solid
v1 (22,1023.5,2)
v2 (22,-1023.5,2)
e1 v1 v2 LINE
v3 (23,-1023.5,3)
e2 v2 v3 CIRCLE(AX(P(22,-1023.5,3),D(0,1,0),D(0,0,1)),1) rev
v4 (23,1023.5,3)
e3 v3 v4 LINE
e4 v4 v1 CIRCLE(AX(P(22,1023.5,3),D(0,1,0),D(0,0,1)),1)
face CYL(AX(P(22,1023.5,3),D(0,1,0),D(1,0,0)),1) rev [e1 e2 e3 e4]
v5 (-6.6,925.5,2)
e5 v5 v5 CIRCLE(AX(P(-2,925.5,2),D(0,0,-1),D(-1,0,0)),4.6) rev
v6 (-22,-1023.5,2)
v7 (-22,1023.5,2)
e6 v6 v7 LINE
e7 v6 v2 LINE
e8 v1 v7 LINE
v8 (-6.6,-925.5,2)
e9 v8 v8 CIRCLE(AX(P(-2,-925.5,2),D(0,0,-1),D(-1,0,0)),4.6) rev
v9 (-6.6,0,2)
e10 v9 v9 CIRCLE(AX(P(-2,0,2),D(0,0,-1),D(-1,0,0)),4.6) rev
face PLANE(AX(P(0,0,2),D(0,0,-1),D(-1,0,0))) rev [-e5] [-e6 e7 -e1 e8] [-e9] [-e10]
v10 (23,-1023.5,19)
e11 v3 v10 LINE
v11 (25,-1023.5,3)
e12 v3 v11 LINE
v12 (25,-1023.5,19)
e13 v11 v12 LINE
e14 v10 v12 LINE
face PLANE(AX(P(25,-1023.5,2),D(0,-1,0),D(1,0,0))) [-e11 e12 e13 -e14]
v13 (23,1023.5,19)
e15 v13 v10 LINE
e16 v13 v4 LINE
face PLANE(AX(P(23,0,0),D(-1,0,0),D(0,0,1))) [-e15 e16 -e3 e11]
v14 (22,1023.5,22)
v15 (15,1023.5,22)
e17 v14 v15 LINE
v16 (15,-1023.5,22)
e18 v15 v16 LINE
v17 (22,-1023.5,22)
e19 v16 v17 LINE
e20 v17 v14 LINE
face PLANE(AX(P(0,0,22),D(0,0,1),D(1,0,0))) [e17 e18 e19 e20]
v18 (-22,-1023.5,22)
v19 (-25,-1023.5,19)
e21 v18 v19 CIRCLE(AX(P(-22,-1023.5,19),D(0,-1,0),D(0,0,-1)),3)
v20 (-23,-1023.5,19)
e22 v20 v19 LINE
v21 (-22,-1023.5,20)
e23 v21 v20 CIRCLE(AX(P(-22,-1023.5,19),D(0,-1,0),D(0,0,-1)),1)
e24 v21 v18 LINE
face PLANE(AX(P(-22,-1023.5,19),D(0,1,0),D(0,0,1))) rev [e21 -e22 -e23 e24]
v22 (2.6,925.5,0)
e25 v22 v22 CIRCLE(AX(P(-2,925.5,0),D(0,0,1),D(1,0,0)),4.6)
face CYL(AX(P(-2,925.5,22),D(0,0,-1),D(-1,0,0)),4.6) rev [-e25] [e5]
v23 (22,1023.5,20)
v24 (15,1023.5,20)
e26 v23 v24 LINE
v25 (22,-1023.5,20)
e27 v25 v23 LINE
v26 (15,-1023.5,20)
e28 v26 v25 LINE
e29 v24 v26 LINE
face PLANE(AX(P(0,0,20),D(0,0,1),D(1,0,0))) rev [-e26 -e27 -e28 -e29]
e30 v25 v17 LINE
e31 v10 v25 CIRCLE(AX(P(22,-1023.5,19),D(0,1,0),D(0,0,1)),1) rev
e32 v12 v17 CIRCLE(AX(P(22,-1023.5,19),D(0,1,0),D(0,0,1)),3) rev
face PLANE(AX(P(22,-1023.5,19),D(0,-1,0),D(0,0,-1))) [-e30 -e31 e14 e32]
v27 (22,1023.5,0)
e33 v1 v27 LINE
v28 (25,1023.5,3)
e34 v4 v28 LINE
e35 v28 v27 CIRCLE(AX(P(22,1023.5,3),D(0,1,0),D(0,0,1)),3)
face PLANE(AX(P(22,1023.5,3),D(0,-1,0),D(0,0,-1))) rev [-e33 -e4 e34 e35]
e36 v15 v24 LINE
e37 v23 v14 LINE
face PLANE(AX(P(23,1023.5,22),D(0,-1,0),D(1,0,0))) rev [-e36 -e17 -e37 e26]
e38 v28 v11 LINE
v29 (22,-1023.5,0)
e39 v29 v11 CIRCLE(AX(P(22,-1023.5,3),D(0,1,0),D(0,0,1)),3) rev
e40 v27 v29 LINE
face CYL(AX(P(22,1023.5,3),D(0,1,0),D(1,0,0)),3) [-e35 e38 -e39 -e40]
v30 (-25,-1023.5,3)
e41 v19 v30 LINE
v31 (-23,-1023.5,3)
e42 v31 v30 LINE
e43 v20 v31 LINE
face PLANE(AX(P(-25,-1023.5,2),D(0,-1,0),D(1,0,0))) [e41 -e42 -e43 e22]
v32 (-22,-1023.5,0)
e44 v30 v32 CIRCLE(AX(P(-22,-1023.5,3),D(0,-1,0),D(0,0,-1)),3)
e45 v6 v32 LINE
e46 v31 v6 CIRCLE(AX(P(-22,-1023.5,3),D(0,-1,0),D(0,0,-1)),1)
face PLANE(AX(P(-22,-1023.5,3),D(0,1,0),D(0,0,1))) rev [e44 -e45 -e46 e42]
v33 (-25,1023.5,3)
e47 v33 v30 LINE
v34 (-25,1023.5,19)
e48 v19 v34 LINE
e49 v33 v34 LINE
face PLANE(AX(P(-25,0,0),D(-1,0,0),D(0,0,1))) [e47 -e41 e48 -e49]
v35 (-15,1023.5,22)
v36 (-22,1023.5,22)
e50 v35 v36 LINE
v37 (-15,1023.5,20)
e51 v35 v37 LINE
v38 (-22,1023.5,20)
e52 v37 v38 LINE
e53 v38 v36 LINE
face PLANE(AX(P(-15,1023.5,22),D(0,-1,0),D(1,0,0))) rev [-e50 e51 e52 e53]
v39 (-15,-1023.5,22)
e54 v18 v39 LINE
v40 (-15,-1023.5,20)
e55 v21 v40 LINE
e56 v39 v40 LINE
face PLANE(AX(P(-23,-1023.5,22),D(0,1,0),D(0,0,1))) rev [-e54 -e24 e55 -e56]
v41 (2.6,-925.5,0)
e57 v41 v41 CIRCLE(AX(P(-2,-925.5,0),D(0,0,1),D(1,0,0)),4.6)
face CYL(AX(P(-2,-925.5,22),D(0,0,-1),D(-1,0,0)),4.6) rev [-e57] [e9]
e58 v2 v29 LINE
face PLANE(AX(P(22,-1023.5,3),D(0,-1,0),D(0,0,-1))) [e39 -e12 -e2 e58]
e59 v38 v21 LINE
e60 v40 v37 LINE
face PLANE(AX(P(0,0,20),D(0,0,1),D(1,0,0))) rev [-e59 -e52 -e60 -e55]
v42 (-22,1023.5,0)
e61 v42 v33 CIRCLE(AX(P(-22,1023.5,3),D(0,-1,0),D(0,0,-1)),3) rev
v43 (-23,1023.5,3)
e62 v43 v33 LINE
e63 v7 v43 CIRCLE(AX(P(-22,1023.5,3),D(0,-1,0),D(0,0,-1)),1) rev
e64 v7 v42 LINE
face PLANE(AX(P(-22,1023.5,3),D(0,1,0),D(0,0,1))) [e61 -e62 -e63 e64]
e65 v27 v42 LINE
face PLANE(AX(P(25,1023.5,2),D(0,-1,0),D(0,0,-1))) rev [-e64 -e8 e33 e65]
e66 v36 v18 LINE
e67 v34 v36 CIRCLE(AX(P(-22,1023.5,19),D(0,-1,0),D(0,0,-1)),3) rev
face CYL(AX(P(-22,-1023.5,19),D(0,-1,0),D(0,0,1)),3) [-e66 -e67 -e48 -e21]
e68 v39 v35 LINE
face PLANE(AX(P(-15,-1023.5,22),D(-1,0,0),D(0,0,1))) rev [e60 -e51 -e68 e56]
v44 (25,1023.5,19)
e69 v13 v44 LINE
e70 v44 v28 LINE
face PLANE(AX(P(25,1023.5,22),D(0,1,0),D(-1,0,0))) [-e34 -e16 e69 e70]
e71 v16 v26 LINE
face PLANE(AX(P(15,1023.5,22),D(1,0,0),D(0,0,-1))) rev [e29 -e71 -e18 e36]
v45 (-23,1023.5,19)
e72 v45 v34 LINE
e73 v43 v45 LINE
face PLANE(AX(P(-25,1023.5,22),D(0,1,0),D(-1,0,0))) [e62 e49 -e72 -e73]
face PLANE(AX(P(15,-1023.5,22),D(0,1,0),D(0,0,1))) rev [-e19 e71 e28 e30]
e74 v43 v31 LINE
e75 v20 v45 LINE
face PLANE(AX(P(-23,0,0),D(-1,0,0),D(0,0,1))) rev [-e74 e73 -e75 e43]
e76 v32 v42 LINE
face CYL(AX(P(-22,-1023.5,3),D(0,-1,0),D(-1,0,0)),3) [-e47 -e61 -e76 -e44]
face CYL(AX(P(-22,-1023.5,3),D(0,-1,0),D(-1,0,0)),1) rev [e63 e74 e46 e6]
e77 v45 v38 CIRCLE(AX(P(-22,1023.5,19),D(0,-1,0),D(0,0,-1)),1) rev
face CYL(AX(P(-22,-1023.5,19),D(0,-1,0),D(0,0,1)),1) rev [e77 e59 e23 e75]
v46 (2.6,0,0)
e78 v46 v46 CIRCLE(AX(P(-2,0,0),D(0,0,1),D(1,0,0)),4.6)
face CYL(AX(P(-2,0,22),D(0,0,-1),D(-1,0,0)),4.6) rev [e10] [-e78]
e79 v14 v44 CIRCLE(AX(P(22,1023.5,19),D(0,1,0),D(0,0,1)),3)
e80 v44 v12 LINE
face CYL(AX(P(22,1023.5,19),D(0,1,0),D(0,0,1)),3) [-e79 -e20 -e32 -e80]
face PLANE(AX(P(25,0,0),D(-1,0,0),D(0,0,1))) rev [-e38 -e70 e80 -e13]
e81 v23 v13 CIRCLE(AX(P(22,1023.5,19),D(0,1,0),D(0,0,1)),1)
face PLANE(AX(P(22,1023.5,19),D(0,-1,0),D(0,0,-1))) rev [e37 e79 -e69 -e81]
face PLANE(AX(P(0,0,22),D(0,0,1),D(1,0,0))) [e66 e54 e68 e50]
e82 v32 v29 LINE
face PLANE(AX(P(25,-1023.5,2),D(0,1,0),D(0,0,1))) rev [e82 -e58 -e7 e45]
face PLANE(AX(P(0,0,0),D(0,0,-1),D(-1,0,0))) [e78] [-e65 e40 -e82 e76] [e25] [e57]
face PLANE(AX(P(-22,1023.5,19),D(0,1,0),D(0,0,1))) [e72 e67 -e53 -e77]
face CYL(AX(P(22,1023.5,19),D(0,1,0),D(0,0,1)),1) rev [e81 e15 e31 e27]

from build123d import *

# Parameters (mm, degrees)
BASEFLANGE_W                   = 50
BASEFLANGE_H                   = 2047
BASE_FLANGE1_DEPTH             = 2
EDGE_FLANGE1_STRIP_W           = 10
EDGE_FLANGE1_STRIP_H           = 2
EDGE_FLANGE1_STRIP_CUT_DEPTH   = 2047
EDGE_FLANGE1_STRIP_2_W         = 10
EDGE_FLANGE1_STRIP_2_H         = 2
EDGE_FLANGE1_STRIP_CUT_2_DEPTH = 2047
EDGE_FLANGE1_DEPTH             = 2047
EDGE_FLANGE1_BEND_DEPTH        = 2047
EDGE_FLANGE2_STRIP_W           = 10
EDGE_FLANGE2_STRIP_H           = 2
EDGE_FLANGE2_STRIP_CUT_DEPTH   = 2047
EDGE_FLANGE2_STRIP_2_W         = 10
EDGE_FLANGE2_STRIP_2_H         = 2
EDGE_FLANGE2_STRIP_CUT_2_DEPTH = 2047
EDGE_FLANGE2_DEPTH             = 2047
EDGE_FLANGE2_BEND_DEPTH        = 2047
HINGEHOLES_R                   = 4.6
CUT_EXTRUDE1_DEPTH             = 1025.041625131


# Sheet-metal steps are written as plain solids
with BuildPart() as part:
    # BaseFlange → Base-Flange1 (new body)
    with BuildSketch(Plane.XY):
        Rectangle(BASEFLANGE_W, BASEFLANGE_H)
    extrude(amount=BASE_FLANGE1_DEPTH)

    # Edge-Flange1 strip (across the edge) → Edge-Flange1 strip cut (cut)
    with BuildSketch(Plane(origin=(25, -1023.5, 2), x_dir=(-1, 0, 0), z_dir=(0, 1, 0))):
        with Locations((-2, -1)):
            Rectangle(EDGE_FLANGE1_STRIP_W, EDGE_FLANGE1_STRIP_H)
    extrude(amount=EDGE_FLANGE1_STRIP_CUT_DEPTH, mode=Mode.SUBTRACT)

    # Edge-Flange1 strip 2 (across the edge) → Edge-Flange1 strip cut 2 (cut)
    with BuildSketch(Plane(origin=(-25, 1023.5, 2), x_dir=(1, 0, 0), z_dir=(0, -1, 0))):
        with Locations((-2, -1)):
            Rectangle(EDGE_FLANGE1_STRIP_2_W, EDGE_FLANGE1_STRIP_2_H)
    extrude(amount=EDGE_FLANGE1_STRIP_CUT_2_DEPTH, mode=Mode.SUBTRACT)

    # Edge-Flange1 section (across the edge) → Edge-Flange1 (add)
    with BuildSketch(Plane(origin=(25, -1023.5, 2), x_dir=(-1, 0, 0), z_dir=(0, 1, 0))):
        with BuildLine():
            Line((0, 1), (0, 20))
            Line((0, 20), (2, 20))
            Line((2, 20), (2, 1))
            ThreePointArc((2, 1), (2.292893219, 0.292893219), (3, 0))
            Line((3, 0), (3, -2))
            ThreePointArc((3, -2), (0.878679656, -1.121320344), (0, 1))
        make_face()
    extrude(amount=EDGE_FLANGE1_DEPTH)

    # Edge-Flange1 section 2 (across the edge) → Edge-Flange1 bend (add)
    with BuildSketch(Plane(origin=(-25, 1023.5, 2), x_dir=(1, 0, 0), z_dir=(0, -1, 0))):
        with BuildLine():
            Line((0, 1), (0, 20))
            Line((0, 20), (2, 20))
            Line((2, 20), (2, 1))
            ThreePointArc((2, 1), (2.292893219, 0.292893219), (3, 0))
            Line((3, 0), (3, -2))
            ThreePointArc((3, -2), (0.878679656, -1.121320344), (0, 1))
        make_face()
    extrude(amount=EDGE_FLANGE1_BEND_DEPTH)

    # Edge-Flange2 strip (across the edge) → Edge-Flange2 strip cut (cut)
    with BuildSketch(Plane(origin=(-23, 1023.5, 22), x_dir=(0, 0, -1), z_dir=(0, -1, 0))):
        with Locations((-2, -1)):
            Rectangle(EDGE_FLANGE2_STRIP_W, EDGE_FLANGE2_STRIP_H)
    extrude(amount=EDGE_FLANGE2_STRIP_CUT_DEPTH, mode=Mode.SUBTRACT)

    # Edge-Flange2 strip 2 (across the edge) → Edge-Flange2 strip cut 2 (cut)
    with BuildSketch(Plane(origin=(23, -1023.5, 22), x_dir=(0, 0, -1), z_dir=(0, 1, 0))):
        with Locations((-2, -1)):
            Rectangle(EDGE_FLANGE2_STRIP_2_W, EDGE_FLANGE2_STRIP_2_H)
    extrude(amount=EDGE_FLANGE2_STRIP_CUT_2_DEPTH, mode=Mode.SUBTRACT)

    # Edge-Flange2 section (across the edge) → Edge-Flange2 (add)
    with BuildSketch(Plane(origin=(-23, 1023.5, 22), x_dir=(0, 0, -1), z_dir=(0, -1, 0))):
        with BuildLine():
            Line((0, 1), (0, 8))
            Line((0, 8), (2, 8))
            Line((2, 8), (2, 1))
            ThreePointArc((2, 1), (2.292893219, 0.292893219), (3, 0))
            Line((3, 0), (3, -2))
            ThreePointArc((3, -2), (0.878679656, -1.121320344), (0, 1))
        make_face()
    extrude(amount=EDGE_FLANGE2_DEPTH)

    # Edge-Flange2 section 2 (across the edge) → Edge-Flange2 bend (add)
    with BuildSketch(Plane(origin=(23, -1023.5, 22), x_dir=(0, 0, -1), z_dir=(0, 1, 0))):
        with BuildLine():
            Line((0, 1), (0, 8))
            Line((0, 8), (2, 8))
            Line((2, 8), (2, 1))
            ThreePointArc((2, 1), (2.292893219, 0.292893219), (3, 0))
            Line((3, 0), (3, -2))
            ThreePointArc((3, -2), (0.878679656, -1.121320344), (0, 1))
        make_face()
    extrude(amount=EDGE_FLANGE2_BEND_DEPTH)

    # HingeHoles → Cut-Extrude1 (cut, through all)
    with BuildSketch(Plane.XY):
        with Locations(Location((-2, 925.5, 0), (0, 0, 180))):
            Circle(HINGEHOLES_R)
        with Locations(Location((-2, 0, 0), (0, 0, 180))):
            Circle(HINGEHOLES_R)
        with Locations(Location((-2, -925.5, 0), (0, 0, 180))):
            Circle(HINGEHOLES_R)
    extrude(amount=CUT_EXTRUDE1_DEPTH, mode=Mode.SUBTRACT)


solid = part.part
